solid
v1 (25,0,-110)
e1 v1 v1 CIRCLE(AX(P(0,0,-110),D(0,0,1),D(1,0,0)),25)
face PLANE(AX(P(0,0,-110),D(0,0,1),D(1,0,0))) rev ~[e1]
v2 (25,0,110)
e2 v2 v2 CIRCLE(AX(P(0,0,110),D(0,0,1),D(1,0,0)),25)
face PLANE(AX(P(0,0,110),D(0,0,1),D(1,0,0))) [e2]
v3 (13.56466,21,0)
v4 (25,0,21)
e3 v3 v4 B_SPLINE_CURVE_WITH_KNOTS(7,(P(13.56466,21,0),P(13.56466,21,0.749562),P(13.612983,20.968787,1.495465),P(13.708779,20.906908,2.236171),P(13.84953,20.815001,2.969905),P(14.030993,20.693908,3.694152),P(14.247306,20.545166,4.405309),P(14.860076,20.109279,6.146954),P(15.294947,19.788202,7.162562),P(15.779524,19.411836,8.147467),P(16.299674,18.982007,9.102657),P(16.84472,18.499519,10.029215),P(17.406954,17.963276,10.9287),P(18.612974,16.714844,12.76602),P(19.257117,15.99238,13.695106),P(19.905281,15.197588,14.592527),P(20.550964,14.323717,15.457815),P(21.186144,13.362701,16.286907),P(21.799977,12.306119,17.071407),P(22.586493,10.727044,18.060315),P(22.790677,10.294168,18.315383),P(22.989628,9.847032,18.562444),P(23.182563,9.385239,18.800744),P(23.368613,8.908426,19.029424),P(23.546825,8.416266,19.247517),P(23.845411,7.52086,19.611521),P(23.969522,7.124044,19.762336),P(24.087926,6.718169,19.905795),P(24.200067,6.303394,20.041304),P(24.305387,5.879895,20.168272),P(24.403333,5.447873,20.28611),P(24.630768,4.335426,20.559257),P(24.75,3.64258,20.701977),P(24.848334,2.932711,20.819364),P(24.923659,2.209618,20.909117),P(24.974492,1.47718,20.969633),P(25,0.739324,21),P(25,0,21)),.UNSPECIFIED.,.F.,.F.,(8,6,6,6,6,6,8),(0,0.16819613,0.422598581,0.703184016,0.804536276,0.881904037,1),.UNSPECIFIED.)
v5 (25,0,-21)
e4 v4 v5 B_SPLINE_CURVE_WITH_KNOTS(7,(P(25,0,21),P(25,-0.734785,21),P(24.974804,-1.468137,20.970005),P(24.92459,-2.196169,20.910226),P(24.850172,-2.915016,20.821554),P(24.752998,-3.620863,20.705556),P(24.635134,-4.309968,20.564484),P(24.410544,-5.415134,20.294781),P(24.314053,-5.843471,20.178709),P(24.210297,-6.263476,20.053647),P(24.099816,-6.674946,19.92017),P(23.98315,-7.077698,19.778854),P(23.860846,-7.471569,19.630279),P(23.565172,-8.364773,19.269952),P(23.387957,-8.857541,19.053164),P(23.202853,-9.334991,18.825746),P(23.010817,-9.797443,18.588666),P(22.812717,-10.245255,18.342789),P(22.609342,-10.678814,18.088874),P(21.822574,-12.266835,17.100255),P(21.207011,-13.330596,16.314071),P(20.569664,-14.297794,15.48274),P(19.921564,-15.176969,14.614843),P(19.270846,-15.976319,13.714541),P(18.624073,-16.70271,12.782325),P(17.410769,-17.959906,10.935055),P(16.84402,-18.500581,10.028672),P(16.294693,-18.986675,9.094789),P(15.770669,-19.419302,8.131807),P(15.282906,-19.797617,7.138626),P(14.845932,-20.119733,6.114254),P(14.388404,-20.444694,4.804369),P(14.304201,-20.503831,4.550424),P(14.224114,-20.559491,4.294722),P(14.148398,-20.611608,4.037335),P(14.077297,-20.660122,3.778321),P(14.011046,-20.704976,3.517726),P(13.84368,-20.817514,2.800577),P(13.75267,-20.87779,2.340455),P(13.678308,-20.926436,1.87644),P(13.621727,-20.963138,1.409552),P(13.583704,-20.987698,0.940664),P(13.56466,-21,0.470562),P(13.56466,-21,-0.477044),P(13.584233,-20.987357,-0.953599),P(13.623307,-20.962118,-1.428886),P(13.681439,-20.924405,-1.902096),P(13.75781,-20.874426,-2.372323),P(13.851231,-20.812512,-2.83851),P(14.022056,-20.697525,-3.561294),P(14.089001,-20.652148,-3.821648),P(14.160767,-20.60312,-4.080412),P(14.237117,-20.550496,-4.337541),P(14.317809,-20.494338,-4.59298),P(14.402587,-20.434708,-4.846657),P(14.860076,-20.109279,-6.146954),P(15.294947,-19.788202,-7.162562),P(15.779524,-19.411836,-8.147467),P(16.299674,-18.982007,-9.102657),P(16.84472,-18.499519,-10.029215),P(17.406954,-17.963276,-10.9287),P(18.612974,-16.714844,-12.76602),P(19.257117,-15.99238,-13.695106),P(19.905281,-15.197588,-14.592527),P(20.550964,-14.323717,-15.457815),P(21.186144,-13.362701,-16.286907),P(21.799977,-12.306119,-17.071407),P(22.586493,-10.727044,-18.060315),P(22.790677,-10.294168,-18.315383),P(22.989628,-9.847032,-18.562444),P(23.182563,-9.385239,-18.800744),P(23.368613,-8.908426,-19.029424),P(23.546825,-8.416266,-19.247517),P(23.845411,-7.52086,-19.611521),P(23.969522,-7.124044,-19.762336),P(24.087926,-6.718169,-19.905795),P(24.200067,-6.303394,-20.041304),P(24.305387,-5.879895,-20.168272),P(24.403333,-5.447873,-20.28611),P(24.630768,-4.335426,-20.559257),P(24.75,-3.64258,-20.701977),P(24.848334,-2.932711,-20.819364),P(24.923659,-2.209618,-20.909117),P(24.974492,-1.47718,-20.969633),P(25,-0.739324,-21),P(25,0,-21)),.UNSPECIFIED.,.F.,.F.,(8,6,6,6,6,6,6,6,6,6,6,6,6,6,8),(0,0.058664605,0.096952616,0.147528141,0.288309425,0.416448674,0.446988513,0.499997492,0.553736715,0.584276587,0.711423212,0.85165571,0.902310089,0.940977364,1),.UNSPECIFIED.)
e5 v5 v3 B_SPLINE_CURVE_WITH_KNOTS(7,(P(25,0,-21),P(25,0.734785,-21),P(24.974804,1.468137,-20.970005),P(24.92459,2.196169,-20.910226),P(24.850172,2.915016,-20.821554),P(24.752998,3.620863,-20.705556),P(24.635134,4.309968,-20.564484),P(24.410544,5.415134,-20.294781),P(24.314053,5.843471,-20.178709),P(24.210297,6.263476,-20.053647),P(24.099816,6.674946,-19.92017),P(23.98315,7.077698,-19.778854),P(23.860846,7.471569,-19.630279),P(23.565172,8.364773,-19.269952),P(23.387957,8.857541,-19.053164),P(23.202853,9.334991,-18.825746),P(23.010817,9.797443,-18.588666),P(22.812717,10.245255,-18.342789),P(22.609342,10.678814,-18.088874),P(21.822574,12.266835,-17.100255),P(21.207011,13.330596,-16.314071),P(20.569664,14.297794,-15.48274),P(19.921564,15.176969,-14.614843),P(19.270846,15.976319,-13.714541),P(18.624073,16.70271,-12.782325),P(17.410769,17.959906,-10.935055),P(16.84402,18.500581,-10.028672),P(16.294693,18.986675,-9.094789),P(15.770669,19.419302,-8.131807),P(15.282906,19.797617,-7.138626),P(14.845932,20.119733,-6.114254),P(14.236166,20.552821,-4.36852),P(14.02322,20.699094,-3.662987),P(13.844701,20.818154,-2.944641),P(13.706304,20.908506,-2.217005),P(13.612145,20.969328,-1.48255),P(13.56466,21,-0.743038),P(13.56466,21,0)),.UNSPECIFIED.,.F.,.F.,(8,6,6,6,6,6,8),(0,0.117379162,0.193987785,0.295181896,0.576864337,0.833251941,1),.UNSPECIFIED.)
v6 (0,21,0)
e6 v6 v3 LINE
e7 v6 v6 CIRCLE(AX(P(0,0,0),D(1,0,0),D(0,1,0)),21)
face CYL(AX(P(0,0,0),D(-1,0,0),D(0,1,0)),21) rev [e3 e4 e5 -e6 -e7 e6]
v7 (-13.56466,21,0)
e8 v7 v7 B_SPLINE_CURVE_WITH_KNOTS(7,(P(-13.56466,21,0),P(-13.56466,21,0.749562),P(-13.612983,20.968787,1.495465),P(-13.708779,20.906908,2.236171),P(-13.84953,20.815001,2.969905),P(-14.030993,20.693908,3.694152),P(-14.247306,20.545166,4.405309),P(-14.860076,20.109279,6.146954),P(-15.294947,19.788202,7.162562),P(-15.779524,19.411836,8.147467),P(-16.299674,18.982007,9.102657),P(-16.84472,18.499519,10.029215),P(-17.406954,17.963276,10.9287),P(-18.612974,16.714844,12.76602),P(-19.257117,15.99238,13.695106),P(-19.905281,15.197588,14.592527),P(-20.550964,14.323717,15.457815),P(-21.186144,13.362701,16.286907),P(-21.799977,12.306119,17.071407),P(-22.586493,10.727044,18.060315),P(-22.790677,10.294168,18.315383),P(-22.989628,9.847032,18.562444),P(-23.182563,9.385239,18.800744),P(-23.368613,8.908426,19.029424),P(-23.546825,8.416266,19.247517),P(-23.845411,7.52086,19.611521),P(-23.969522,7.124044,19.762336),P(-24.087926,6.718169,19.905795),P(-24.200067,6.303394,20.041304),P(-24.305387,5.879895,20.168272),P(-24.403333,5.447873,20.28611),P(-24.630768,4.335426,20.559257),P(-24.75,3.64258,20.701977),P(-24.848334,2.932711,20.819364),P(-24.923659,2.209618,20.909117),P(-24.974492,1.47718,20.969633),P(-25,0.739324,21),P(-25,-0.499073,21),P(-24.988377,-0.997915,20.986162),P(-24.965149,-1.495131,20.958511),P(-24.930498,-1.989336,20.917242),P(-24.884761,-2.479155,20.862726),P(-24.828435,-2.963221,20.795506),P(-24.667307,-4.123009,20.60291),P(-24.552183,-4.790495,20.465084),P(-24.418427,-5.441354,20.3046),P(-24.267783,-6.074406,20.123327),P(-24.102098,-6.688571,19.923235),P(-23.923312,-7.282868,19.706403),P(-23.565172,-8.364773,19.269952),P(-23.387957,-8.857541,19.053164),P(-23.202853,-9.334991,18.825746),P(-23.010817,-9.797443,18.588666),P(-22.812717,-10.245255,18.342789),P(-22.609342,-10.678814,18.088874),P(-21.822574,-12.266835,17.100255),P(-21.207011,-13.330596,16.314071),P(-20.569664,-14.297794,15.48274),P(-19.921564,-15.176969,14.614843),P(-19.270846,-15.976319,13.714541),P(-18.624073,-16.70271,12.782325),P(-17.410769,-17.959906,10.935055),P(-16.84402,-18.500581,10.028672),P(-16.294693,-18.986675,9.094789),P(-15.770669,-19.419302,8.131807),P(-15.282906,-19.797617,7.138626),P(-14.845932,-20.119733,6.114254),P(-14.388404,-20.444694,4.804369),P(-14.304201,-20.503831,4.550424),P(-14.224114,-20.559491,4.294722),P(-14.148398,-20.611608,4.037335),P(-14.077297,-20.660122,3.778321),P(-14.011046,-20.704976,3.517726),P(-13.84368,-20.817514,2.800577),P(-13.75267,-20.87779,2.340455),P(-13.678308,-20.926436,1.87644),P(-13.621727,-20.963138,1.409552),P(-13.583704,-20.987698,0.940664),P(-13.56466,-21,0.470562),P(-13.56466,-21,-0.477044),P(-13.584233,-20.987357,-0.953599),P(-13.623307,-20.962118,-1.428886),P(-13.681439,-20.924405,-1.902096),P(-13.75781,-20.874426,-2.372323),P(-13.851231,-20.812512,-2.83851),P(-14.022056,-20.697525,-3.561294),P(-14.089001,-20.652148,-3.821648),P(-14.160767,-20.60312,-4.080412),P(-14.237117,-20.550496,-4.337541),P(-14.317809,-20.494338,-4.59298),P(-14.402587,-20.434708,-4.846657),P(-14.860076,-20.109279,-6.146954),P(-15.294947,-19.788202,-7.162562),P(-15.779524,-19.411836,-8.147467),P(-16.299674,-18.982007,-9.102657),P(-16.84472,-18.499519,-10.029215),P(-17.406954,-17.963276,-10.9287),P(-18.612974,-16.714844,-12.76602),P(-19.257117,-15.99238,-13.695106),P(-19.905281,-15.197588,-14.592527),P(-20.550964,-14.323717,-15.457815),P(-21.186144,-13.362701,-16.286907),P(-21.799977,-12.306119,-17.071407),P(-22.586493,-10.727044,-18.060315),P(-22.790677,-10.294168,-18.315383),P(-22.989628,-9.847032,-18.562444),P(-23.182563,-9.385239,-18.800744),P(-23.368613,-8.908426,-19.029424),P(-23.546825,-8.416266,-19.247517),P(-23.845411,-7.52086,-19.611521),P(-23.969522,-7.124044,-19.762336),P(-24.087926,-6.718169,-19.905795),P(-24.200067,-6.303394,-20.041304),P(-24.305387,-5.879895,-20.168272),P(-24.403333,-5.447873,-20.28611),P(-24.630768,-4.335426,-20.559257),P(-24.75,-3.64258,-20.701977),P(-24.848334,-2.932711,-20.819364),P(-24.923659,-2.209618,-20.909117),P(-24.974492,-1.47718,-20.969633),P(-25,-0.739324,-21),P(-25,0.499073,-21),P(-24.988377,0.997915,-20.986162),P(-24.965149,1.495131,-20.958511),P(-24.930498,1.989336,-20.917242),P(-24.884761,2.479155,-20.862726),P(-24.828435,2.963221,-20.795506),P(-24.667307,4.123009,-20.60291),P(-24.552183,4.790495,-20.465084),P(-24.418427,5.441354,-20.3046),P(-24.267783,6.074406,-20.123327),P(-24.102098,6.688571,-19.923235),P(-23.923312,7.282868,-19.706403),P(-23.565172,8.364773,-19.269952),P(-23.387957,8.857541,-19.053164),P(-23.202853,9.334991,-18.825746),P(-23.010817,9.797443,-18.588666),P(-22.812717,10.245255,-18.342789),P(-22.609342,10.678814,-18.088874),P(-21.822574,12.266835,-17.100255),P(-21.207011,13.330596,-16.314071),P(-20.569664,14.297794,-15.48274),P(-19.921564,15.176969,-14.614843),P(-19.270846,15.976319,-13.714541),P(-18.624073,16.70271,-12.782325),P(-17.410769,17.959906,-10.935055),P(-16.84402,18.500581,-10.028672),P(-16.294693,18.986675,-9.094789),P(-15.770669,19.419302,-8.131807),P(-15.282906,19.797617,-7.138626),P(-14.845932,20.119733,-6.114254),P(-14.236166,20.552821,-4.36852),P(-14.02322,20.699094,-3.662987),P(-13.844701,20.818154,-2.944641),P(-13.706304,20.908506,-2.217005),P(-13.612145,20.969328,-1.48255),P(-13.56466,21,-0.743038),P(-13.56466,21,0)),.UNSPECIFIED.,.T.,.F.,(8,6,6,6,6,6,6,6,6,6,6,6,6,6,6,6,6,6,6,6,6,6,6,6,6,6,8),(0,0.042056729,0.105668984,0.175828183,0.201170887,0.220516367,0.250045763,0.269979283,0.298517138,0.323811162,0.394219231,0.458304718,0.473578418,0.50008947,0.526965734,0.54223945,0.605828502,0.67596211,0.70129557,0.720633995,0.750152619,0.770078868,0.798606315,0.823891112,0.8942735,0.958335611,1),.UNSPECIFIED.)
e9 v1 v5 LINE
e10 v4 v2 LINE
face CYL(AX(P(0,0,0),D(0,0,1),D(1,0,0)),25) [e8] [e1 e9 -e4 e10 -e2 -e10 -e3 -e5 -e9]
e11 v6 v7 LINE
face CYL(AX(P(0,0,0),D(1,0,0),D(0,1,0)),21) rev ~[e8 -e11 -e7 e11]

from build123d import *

# Parameters (mm, degrees)
F0_R          = 25
F1_DEPTH      = 110
F1_DEPTH_BACK = 110
F2_R          = 21
F3_DEPTH      = 25
F3_DEPTH_BACK = 25


# Not quite as in the source:
# - the program builds the solid bodies; features that only make, move or delete a surface that nothing else refers to are left out


with BuildPart() as f1:
    # F0 (on Top) → F1 (new body, two sides)
    with BuildSketch(Plane.XY) as f1_sk:
        Circle(F0_R)
    extrude(amount=F1_DEPTH)
    extrude(f1_sk.sketch, amount=-F1_DEPTH_BACK)

    # F2 (on Right) → F3 (cut, two sides)
    with BuildSketch(Plane.YZ) as f3_sk:
        Circle(F2_R)
    extrude(amount=F3_DEPTH, mode=Mode.SUBTRACT)
    extrude(f3_sk.sketch, amount=-F3_DEPTH_BACK, mode=Mode.SUBTRACT)


solid = f1.part
